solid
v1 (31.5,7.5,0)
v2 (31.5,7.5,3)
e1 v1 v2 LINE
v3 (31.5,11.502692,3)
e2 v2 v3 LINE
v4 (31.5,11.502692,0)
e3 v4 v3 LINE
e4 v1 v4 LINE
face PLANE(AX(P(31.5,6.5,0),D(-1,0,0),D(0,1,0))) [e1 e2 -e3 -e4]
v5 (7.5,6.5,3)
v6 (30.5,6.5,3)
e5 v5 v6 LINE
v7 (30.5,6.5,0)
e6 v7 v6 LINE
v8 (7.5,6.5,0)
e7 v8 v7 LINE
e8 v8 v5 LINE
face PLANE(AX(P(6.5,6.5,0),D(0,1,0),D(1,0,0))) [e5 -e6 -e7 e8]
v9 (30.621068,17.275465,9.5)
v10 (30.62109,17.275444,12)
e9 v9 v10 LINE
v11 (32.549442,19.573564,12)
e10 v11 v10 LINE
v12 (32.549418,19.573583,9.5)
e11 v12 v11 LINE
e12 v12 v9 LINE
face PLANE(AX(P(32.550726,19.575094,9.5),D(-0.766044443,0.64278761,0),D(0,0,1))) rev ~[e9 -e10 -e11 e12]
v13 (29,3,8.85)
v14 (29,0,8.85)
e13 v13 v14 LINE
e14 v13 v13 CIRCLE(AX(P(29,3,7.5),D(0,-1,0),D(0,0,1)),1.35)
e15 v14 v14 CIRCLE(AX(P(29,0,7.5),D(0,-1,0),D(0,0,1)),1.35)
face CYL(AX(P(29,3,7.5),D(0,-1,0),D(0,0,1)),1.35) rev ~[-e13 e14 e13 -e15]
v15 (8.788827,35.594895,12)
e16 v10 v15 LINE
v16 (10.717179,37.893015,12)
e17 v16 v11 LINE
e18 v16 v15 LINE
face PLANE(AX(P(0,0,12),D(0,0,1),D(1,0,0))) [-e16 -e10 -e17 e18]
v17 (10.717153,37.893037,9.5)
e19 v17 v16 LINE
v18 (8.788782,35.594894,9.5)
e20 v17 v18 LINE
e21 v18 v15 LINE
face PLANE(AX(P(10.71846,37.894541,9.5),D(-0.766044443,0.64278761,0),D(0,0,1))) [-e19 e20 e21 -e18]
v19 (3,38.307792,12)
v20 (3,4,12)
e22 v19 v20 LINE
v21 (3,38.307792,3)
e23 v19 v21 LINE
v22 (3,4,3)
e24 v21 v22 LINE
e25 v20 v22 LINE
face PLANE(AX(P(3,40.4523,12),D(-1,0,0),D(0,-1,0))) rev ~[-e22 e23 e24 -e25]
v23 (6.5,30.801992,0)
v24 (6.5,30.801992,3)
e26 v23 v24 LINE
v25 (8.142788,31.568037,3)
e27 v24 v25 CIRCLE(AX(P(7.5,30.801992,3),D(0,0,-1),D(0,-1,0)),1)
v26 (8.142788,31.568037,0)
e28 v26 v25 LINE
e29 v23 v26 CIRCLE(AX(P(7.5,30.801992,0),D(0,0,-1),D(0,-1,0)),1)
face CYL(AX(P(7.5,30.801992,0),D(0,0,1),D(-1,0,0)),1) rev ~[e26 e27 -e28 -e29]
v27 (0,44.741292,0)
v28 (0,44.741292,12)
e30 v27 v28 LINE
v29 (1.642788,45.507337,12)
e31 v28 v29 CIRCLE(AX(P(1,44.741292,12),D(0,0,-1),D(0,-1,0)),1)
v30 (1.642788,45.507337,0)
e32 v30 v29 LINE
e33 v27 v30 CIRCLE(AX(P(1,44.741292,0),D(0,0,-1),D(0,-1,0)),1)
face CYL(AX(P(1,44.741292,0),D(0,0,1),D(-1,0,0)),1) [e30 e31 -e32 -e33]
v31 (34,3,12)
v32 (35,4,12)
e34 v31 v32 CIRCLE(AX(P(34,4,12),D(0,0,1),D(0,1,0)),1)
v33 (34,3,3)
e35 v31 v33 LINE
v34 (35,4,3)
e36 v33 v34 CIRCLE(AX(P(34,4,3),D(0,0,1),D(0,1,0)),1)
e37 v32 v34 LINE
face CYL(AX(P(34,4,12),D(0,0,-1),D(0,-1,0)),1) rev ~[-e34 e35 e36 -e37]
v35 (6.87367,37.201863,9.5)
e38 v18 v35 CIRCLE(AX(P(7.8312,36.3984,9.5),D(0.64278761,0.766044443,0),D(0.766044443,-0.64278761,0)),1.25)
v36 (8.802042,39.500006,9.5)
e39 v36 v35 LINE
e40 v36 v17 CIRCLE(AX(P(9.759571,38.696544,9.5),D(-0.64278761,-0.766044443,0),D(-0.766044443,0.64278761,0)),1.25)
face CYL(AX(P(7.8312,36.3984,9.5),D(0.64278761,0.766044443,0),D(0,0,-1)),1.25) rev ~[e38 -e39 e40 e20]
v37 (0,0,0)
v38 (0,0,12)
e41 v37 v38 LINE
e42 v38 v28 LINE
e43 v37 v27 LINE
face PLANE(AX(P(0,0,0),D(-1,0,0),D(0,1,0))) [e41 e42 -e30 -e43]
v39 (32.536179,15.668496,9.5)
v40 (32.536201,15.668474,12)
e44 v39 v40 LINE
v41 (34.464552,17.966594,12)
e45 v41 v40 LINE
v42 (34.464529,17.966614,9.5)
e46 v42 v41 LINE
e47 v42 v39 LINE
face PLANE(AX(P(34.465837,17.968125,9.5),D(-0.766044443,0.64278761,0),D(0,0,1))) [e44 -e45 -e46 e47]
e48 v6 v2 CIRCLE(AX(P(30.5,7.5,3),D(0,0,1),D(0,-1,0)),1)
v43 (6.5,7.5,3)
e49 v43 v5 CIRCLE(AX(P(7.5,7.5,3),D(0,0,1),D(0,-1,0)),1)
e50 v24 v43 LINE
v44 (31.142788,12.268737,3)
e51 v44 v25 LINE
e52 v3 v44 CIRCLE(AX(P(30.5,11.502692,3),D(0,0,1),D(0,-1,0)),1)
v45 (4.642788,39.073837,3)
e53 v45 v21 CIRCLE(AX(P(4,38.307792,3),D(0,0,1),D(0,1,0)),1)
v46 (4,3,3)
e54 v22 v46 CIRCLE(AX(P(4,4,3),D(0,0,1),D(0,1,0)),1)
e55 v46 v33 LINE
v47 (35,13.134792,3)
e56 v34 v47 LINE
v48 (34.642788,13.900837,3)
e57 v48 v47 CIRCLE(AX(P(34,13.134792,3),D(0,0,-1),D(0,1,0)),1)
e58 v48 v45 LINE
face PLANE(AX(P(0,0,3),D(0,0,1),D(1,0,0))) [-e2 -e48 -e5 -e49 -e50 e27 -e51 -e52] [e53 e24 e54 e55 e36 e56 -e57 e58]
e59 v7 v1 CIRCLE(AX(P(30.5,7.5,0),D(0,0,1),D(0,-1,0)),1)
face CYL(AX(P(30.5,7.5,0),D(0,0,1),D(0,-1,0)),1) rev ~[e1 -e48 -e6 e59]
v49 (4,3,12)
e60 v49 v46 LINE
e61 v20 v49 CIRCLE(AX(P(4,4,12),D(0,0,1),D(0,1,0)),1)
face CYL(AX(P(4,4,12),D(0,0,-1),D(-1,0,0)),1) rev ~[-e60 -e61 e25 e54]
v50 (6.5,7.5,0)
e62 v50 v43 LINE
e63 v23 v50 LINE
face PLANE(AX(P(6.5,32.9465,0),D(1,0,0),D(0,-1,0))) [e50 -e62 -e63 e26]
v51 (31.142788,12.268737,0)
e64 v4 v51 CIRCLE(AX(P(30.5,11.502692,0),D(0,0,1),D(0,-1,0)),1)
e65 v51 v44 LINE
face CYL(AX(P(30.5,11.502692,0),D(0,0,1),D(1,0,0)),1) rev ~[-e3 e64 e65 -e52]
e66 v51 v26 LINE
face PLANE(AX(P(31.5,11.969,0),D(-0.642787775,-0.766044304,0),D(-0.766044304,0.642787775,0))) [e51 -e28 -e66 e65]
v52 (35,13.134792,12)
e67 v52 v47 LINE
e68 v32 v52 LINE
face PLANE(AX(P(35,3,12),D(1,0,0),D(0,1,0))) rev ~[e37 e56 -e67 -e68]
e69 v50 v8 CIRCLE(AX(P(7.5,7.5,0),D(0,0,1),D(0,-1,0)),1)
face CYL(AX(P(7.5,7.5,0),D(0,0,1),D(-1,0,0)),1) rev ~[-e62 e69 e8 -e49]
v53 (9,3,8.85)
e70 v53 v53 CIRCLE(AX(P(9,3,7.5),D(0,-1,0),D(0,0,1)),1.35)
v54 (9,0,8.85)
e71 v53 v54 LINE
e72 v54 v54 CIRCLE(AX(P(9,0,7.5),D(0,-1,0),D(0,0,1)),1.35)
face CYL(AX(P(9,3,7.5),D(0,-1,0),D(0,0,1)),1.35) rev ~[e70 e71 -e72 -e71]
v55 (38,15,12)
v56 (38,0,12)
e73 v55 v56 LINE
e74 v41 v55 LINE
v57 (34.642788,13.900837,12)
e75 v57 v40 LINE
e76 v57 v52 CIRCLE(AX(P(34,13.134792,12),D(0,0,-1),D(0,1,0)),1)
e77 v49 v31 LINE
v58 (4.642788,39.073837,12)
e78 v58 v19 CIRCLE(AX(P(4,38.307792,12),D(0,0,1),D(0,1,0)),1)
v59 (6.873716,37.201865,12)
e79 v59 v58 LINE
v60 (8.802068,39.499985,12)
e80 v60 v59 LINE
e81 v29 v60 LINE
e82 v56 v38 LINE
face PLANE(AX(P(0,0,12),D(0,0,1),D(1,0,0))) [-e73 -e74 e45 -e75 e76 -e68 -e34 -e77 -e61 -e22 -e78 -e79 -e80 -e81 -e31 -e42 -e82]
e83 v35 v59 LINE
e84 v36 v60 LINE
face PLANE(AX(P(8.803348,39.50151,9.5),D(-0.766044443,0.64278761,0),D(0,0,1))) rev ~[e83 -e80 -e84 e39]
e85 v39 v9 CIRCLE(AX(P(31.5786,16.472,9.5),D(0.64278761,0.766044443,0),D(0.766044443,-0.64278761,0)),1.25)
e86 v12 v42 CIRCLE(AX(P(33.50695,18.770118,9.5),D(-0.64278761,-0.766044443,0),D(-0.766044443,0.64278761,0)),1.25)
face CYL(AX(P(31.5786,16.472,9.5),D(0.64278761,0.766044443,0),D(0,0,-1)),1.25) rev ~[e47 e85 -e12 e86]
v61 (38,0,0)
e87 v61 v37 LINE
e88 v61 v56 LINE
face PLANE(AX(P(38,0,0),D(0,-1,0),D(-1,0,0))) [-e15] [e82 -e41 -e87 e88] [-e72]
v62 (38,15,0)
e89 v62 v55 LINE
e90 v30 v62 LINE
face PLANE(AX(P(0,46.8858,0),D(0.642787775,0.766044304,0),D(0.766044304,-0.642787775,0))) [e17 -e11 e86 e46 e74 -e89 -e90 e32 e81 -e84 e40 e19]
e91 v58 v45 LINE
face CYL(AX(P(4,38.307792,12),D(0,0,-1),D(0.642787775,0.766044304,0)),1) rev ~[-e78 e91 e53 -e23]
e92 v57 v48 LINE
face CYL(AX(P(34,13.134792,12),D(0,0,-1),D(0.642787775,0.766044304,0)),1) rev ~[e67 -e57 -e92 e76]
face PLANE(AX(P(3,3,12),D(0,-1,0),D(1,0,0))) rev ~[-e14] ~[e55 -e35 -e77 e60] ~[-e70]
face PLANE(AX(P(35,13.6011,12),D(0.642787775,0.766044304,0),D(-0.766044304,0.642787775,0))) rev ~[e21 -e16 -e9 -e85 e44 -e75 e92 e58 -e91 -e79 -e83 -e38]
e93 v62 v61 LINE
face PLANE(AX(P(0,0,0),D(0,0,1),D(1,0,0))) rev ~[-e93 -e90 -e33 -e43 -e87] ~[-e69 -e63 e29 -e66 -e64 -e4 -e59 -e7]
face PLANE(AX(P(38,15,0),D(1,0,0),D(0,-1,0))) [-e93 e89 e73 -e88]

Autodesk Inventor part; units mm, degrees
ref_plane "YZ Plane" through (0, 0, 0) normal (1, 0, 0) x (0, 1, 0)
ref_plane "XZ Plane" through (0, 0, 0) normal (0, 1, 0) x (-1, 0, 0)
ref_plane "XY Plane" through (0, 0, 0) normal (0, 0, 1) x (1, 0, 0)
sketch "Skizze1" plane through (0, 0, 0) normal (0, 0, 1) x (1, 0, 0)
  line L0 (0, 0) -> (0, 46.8858)
  line L1 (0, 46.8858) -> (38, 15)
  line L2 (38, 15) -> (38, 0)
  line L3 (38, 0) -> (0, 0)
  line L4 (6.5, 32.9465) -> (6.5, 6.5)
  line L5 (6.5, 6.5) -> (31.5, 6.5)
  line L6 (31.5, 6.5) -> (31.5, 11.969)
  line L7 (31.5, 11.969) -> (6.5, 32.9465)
  dimension "d0" = 130
  dimension "d1" = 15
  dimension "d2" = 38
  dimension "d3" = 6.5
  dimension "d4" = 6.5
  dimension "d5" = 6.5
  dimension "d6" = 6.5
extrude "Extrusion1" add sketch "Skizze1" along normal blind 12
sketch "Skizze2" plane through (0, 0, 12) normal (0, 0, 1) x (1, 0, 0)
  line L0 (3, 40.4523) -> (3, 3)
  line L1 (3, 3) -> (35, 3)
  line L2 (35, 3) -> (35, 13.6011)
  line L3 (35, 13.6011) -> (3, 40.4523)
  line L4 (0, 0) -> (38, 0) projected
  line L5 (0, 46.8858) -> (0, 0) projected
  line L6 (38, 15) -> (0, 46.8858) projected
  line L7 (38, 0) -> (38, 15) projected
  dimension "d9" = 3
  dimension "d10" = 3
  dimension "d11" = 3
  dimension "d12" = 3
extrude "Extrusion2" cut sketch "Skizze2" against normal blind 9 contours L3 L2 L1 L0
sketch "Skizze3" plane through (3, 3, 12) normal (0, 1, 0) x (1, 0, 0)
  line L0 (-3, 0) -> (-3, 12) projected
  line L1 (-3, 12) -> (35, 12) projected
  line L2 (35, 12) -> (35, 0) projected
  line L3 (35, 0) -> (32, 0) projected
  line L4 (32, 0) -> (0, 0) projected
  line L5 (0, 0) -> (-3, 0) projected
  line L6 (32, 0) -> (32, 9) projected
  line L7 (32, 9) -> (0, 9) projected
  line L8 (0, 9) -> (0, 0) projected
  line L9 (0, 0) -> (0, 9) projected
  line L10 (32, 0) -> (32, 9) projected
  line L11 (32, 4.5) -> (0, 4.5)
  point P0 (6, 4.5)
  point P1 (26, 4.5)
  dimension "d15" = 6
  dimension "d17" = 6
hole "Bohrung1" at (9, 3, 7.5) at (29, 3, 7.5) direction (0, -1, 0) diameter 2.7 depth 8 tip angle 118
fillet "Rundung1" radius 1 9 edges at (35, 13.6011, 7.5) (31.5, 11.969, 1.5) (31.5, 6.5, 1.5) (35, 3, 7.5) (6.5, 6.5, 1.5) (3, 3, 7.5) (6.5, 32.9465, 1.5) (3, 40.4523, 7.5) (0, 46.8858, 6)
sketch "Skizze4" plane through (4.6428, 39.0738, 3) normal (-0.6427876, -0.7660444, 0) x (0.7660444, -0.6427876, 0)
  line L0 (-6.0607, 9) -> (0, 9) projected
  line L1 (0, 9) -> (39.1622, 9) projected
  line L2 (39.1622, 9) -> (43.5447, 9) projected
  line L3 (43.5447, 9) -> (43.5447, -3) projected
  line L4 (43.5447, -3) -> (-6.0607, -3) projected
  line L5 (-6.0607, -3) -> (-6.0607, 9) projected
  line L6 (0, 0) -> (0, 9) projected
  line L7 (0, 0) -> (39.1622, 0) projected
  line L8 (39.1622, 0) -> (39.1622, 9) projected
  point P0 (21.5596, -3)
  point P1 (35.1622, 6.5)
  point P2 (4.1622, 6.5)
  point P3 (35.1622, 6.5)
  dimension "d26" = 2.5
  dimension "d27" = 4
  dimension "d28" = 2.5
  dimension "d29" = 35
  dimension "d30" = 4.1622
hole "Bohrung2" at (31.5786, 16.472, 9.5) at (7.8312, 36.3984, 9.5) direction (0.6427876, 0.7660444, 0) diameter 2.5 depth 8 tip angle 118
sketch "Skizze5" plane through (38, 15, 12) normal (0.6427876, 0.7660444, 0) x (0.7660444, -0.6427876, 0)
  circle A0 centre (-5.8652, 2.5) radius 1.25 projected
  line L0 (-4.6152, 2.5) -> (-4.6152, 0)
  line L1 (-19.4679, 0) -> (9.6418, 0) projected
  line L2 (-7.1152, 2.5) -> (-7.1152, 0)
  circle A1 centre (-36.8652, 2.5) radius 1.25 projected
  line L3 (-35.6152, 2.5) -> (-35.6152, 0)
  line L4 (-41.0274, 0) -> (-1.8652, 0) projected
  line L5 (-38.1152, 2.5) -> (-38.1152, 0)
  point P0 (-19.4679, 12)
extrude "Extrusion3" cut sketch "Skizze5" against normal blind 4.5 contours L0 L1 L2 A0 | L3 L4 L5 A1
properties part number "lcd_halterung_162C_links"
